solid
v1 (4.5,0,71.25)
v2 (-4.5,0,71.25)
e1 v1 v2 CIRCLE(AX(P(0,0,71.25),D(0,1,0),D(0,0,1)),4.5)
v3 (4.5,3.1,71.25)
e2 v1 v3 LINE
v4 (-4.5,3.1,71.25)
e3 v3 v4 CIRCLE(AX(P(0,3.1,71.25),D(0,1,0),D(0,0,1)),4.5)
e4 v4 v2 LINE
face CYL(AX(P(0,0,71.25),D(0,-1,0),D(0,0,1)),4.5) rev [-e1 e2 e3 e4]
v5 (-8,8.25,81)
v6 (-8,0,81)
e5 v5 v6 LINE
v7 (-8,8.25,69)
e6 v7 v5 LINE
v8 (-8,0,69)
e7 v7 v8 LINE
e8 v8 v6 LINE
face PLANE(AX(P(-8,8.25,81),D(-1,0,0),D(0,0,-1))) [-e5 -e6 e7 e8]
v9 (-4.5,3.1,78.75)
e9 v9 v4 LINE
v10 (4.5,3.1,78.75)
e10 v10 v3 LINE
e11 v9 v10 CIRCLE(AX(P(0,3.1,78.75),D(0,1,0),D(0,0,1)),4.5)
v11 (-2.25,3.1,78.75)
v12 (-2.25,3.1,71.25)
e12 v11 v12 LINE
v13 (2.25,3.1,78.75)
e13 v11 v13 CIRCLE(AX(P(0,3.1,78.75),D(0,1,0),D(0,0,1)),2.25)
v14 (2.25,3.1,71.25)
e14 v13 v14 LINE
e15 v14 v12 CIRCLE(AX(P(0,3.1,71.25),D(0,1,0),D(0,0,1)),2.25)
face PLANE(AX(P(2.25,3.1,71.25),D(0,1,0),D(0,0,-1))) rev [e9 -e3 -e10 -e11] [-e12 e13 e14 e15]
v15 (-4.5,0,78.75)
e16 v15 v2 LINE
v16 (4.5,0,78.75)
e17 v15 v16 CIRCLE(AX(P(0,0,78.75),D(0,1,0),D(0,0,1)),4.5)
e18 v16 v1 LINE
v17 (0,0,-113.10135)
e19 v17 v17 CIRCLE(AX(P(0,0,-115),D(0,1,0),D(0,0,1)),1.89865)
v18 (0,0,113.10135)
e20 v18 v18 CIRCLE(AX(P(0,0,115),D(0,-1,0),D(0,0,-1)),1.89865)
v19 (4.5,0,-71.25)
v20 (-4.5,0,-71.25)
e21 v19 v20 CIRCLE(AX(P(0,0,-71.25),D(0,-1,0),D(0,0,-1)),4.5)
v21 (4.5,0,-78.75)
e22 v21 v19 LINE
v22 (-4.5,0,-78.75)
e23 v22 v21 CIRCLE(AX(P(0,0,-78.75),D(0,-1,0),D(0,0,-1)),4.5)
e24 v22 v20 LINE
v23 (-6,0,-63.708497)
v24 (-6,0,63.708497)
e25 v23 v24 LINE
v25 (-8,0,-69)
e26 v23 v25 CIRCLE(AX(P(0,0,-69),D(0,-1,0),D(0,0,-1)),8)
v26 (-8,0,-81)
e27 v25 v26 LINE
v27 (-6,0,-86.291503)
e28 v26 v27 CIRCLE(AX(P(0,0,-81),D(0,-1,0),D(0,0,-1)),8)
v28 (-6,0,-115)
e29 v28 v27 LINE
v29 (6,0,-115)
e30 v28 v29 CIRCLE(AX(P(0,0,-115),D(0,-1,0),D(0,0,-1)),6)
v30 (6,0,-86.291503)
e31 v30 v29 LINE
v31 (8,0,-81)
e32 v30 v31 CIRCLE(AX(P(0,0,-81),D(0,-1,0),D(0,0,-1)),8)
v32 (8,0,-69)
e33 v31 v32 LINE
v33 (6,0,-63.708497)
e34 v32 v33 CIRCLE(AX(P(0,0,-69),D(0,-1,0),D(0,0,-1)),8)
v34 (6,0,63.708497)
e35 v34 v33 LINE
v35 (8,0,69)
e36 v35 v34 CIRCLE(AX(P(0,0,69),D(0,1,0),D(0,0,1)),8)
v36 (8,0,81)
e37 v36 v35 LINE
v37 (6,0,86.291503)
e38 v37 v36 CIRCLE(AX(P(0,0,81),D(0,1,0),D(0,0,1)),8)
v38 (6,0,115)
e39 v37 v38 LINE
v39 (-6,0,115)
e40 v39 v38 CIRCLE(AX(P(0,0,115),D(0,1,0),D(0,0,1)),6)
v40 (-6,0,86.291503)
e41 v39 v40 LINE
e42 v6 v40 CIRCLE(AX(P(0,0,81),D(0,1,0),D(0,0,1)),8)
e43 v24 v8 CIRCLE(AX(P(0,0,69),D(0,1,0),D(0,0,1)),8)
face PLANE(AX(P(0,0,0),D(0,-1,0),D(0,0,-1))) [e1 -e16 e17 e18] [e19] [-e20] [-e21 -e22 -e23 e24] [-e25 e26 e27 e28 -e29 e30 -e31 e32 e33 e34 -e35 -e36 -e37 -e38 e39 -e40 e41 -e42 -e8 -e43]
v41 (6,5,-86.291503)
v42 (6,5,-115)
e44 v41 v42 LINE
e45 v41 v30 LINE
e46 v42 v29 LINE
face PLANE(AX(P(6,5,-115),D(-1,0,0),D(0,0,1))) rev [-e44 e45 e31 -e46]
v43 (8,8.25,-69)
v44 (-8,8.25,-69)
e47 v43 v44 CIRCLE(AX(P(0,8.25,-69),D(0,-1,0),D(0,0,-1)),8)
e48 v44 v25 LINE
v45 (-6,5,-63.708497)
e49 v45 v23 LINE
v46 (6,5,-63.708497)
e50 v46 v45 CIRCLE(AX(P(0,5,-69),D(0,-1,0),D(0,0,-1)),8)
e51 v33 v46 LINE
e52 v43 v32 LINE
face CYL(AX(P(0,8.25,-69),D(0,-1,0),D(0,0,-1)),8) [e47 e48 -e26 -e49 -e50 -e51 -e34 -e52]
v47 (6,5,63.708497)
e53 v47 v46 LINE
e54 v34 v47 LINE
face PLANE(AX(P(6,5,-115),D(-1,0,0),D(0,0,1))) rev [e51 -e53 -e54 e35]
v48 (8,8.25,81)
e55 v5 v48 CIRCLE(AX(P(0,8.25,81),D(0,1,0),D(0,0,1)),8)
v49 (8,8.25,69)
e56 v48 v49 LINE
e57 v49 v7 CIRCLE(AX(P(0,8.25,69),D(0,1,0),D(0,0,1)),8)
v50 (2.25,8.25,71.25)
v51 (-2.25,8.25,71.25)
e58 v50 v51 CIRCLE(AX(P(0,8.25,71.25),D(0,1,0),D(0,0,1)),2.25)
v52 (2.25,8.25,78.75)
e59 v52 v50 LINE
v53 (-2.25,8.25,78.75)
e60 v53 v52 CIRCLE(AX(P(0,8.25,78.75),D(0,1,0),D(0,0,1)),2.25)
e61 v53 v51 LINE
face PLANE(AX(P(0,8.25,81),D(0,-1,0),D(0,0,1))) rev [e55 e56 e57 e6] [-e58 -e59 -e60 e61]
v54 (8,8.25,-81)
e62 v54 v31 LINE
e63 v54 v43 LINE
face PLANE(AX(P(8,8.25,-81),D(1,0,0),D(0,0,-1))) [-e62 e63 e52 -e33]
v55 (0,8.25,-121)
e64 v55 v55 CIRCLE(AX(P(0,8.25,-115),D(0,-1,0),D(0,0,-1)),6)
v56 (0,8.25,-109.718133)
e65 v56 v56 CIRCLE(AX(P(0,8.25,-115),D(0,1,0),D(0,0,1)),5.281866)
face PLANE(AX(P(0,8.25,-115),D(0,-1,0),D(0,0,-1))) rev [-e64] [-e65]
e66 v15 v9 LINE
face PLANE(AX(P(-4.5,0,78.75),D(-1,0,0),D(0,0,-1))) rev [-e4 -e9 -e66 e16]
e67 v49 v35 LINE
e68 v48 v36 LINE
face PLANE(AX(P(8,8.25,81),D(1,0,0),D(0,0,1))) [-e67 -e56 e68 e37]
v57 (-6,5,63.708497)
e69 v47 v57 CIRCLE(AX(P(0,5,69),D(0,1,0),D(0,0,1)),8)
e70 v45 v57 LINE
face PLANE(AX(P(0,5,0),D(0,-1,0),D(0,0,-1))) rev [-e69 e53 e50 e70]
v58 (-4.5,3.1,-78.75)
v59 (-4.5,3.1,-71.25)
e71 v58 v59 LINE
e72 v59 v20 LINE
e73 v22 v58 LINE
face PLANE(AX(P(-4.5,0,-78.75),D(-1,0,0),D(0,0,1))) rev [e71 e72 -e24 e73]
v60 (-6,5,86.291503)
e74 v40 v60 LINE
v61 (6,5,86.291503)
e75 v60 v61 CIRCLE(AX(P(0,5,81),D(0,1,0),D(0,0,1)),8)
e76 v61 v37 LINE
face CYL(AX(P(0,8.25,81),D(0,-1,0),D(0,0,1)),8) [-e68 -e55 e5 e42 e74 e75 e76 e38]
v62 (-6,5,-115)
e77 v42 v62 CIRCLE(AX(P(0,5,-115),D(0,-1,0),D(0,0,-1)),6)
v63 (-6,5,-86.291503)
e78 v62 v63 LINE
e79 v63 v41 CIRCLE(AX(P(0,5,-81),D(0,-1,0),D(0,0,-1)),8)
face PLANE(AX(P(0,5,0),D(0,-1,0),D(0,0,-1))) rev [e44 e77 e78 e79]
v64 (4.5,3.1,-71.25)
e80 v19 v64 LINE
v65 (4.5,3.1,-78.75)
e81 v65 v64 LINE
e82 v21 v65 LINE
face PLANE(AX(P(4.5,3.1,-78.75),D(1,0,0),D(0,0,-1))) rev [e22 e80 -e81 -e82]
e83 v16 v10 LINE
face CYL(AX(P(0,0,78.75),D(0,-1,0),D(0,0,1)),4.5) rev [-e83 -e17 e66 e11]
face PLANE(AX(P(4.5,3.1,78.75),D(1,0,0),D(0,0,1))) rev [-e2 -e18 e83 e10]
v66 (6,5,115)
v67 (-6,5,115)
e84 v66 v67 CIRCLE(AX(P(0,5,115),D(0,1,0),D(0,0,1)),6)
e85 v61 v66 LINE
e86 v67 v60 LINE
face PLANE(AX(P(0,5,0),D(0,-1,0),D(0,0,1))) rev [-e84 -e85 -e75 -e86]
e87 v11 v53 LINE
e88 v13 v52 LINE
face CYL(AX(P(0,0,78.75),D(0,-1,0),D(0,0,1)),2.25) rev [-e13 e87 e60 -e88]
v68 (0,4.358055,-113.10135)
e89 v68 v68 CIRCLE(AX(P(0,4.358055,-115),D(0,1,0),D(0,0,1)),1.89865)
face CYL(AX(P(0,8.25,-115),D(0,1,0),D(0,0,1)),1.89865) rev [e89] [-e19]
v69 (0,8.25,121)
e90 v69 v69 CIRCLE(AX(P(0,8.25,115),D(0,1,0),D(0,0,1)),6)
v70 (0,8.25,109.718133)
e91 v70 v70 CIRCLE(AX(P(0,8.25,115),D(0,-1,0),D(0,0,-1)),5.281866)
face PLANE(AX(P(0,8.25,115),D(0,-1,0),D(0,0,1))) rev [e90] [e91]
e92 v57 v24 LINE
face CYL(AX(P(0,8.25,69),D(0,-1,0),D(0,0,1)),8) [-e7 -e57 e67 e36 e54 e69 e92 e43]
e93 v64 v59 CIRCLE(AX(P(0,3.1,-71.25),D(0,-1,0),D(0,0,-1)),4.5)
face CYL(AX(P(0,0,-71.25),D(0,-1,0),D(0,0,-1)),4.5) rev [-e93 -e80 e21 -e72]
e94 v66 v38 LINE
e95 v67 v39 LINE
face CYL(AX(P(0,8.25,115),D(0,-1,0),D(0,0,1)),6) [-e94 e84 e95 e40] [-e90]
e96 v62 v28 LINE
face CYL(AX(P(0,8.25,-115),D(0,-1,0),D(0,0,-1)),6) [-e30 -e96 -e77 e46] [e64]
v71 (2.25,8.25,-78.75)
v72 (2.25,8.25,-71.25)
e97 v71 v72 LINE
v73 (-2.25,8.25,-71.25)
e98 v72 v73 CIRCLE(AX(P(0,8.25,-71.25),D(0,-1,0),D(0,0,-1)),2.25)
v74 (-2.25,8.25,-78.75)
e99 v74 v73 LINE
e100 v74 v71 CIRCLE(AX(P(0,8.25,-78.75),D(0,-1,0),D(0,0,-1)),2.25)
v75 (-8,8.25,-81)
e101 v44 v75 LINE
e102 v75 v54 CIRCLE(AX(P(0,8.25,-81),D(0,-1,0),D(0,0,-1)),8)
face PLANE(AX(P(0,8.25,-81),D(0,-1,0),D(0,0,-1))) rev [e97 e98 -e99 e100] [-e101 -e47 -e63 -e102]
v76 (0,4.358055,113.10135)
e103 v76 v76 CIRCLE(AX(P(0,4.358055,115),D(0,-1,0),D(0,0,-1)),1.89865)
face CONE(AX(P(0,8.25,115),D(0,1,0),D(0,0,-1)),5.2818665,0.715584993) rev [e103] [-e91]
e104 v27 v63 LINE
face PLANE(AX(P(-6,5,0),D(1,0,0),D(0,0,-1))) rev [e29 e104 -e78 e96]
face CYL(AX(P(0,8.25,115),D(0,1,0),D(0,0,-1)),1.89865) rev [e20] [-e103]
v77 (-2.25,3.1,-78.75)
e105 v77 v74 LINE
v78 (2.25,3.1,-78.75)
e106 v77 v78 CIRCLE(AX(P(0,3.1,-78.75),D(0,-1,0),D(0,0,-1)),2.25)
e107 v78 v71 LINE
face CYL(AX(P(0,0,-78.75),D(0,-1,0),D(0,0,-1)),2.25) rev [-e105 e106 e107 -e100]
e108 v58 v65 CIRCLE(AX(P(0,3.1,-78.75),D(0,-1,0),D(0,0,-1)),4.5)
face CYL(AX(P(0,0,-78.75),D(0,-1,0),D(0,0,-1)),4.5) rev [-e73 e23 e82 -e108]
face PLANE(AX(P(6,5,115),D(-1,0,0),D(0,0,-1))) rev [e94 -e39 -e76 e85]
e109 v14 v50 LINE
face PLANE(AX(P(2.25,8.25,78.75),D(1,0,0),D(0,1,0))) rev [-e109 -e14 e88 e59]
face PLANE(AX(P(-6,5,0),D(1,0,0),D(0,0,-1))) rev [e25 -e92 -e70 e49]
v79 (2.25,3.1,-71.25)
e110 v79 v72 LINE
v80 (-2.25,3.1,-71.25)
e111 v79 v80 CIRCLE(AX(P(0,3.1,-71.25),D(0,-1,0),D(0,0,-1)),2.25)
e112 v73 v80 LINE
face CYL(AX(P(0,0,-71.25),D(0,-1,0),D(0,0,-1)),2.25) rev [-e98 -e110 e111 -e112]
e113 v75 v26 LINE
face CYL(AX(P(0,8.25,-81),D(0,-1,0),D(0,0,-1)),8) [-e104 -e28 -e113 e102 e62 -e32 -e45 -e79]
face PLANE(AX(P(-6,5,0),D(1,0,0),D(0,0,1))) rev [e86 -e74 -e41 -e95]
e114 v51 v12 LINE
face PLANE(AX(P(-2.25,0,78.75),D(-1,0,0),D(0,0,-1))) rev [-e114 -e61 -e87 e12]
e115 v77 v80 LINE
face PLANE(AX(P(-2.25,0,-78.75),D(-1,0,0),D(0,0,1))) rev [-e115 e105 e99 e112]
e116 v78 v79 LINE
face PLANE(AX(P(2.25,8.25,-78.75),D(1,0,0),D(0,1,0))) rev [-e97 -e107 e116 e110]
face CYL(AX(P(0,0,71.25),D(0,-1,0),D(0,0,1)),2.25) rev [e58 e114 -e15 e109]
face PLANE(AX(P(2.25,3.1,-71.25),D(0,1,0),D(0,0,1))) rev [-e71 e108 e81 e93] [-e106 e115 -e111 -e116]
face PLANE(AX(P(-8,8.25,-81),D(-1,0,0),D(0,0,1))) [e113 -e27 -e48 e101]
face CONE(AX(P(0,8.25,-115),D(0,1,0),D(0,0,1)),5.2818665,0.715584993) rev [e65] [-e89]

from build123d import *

# Parameters (mm, degrees)
ARM_BASE_SKETCH_W                  = 12
ARM_BASE_SKETCH_H                  = 115
ARM_BASE_EXTRUDE_DEPTH             = 5
SCREW_BASES_SKETCH_R               = 6
SCREW_BASES_EXTRUDE_DEPTH          = 8.25
POWER_SUPPLY_MOUNTING_SLOT_DEPTH   = 8.25
POWER_SUPPLY_MOUNTING_SLOT_2_DEPTH = 3.1
NO_6_MOUNTING_SCREWS_D             = 3.7973
NO_6_MOUNTING_SCREWS_CSINK_D       = 10.563733
NO_6_MOUNTING_SCREWS_CSINK_ANGLE   = 82


# Read off the part's stored shape, not the designer's step: Power Supply Mounting Slot
with BuildPart() as part:
    # Arm Base Sketch → Arm Base Extrude (new body)
    with BuildSketch(Plane(origin=(0, 0, 0), x_dir=(1, 0, 0), z_dir=(0, 1, 0))):
        with Locations((0, 57.5)):
            Rectangle(ARM_BASE_SKETCH_W, ARM_BASE_SKETCH_H)
    extrude(amount=ARM_BASE_EXTRUDE_DEPTH)

    # Screw Bases Sketch → Screw Bases Extrude (add)
    with BuildSketch(Plane.XZ):
        with Locations(Location((0, -115, 0), (0, 0, 270))):
            Circle(SCREW_BASES_SKETCH_R)
        with BuildLine():
            Line((-8, -81), (-8, -69))
            ThreePointArc((-8, -69), (0, -61), (8, -69))
            Line((8, -69), (8, -81))
            ThreePointArc((8, -81), (0, -89), (-8, -81))
        make_face()
    extrude(amount=-SCREW_BASES_EXTRUDE_DEPTH)

    # Power Supply Mounting Slot outline → Power Supply Mounting Slot (cut)
    with BuildSketch(Plane(origin=(0, 0, 0), x_dir=(1, 0, 0), z_dir=(0, 1, 0))):
        with BuildLine():
            ThreePointArc((-2.25, 71.25), (0, 69), (2.25, 71.25))
            Line((2.25, 71.25), (2.25, 78.75))
            ThreePointArc((2.25, 78.75), (0, 81), (-2.25, 78.75))
            Line((-2.25, 78.75), (-2.25, 71.25))
        make_face()
    extrude(amount=POWER_SUPPLY_MOUNTING_SLOT_DEPTH, mode=Mode.SUBTRACT)

    # Power Supply Mounting Slot 2 outline → Power Supply Mounting Slot 2 (cut)
    with BuildSketch(Plane(origin=(0, 0, 0), x_dir=(1, 0, 0), z_dir=(0, 1, 0))):
        with BuildLine():
            ThreePointArc((-4.5, 71.25), (0, 66.75), (4.5, 71.25))
            Line((4.5, 71.25), (4.5, 78.75))
            ThreePointArc((4.5, 78.75), (0, 83.25), (-4.5, 78.75))
            Line((-4.5, 78.75), (-4.5, 71.25))
        make_face()
        with BuildLine():
            Line((2.25, 78.75), (2.25, 71.25))
            ThreePointArc((2.25, 71.25), (0, 69), (-2.25, 71.25))
            Line((-2.25, 71.25), (-2.25, 78.75))
            ThreePointArc((-2.25, 78.75), (0, 81), (2.25, 78.75))
        make_face(mode=Mode.SUBTRACT)
    extrude(amount=POWER_SUPPLY_MOUNTING_SLOT_2_DEPTH, mode=Mode.SUBTRACT)

    # No. 6 Mounting Screws (through all)
    with Locations(Plane(origin=(0, 8.25, 0), x_dir=(1, 0, 0), z_dir=(0, 1, 0))):
        with Locations((0, 115)):
            CounterSinkHole(NO_6_MOUNTING_SCREWS_D / 2, NO_6_MOUNTING_SCREWS_CSINK_D / 2, counter_sink_angle=NO_6_MOUNTING_SCREWS_CSINK_ANGLE)

    # Mirror 2: part across plane


with BuildPart() as part_1:
    add(part.part)
    add(part.part.mirror(Plane(origin=(6, 5, 0), x_dir=(1, 0, 0), z_dir=(0, 0, -1))))


solid = part_1.part
